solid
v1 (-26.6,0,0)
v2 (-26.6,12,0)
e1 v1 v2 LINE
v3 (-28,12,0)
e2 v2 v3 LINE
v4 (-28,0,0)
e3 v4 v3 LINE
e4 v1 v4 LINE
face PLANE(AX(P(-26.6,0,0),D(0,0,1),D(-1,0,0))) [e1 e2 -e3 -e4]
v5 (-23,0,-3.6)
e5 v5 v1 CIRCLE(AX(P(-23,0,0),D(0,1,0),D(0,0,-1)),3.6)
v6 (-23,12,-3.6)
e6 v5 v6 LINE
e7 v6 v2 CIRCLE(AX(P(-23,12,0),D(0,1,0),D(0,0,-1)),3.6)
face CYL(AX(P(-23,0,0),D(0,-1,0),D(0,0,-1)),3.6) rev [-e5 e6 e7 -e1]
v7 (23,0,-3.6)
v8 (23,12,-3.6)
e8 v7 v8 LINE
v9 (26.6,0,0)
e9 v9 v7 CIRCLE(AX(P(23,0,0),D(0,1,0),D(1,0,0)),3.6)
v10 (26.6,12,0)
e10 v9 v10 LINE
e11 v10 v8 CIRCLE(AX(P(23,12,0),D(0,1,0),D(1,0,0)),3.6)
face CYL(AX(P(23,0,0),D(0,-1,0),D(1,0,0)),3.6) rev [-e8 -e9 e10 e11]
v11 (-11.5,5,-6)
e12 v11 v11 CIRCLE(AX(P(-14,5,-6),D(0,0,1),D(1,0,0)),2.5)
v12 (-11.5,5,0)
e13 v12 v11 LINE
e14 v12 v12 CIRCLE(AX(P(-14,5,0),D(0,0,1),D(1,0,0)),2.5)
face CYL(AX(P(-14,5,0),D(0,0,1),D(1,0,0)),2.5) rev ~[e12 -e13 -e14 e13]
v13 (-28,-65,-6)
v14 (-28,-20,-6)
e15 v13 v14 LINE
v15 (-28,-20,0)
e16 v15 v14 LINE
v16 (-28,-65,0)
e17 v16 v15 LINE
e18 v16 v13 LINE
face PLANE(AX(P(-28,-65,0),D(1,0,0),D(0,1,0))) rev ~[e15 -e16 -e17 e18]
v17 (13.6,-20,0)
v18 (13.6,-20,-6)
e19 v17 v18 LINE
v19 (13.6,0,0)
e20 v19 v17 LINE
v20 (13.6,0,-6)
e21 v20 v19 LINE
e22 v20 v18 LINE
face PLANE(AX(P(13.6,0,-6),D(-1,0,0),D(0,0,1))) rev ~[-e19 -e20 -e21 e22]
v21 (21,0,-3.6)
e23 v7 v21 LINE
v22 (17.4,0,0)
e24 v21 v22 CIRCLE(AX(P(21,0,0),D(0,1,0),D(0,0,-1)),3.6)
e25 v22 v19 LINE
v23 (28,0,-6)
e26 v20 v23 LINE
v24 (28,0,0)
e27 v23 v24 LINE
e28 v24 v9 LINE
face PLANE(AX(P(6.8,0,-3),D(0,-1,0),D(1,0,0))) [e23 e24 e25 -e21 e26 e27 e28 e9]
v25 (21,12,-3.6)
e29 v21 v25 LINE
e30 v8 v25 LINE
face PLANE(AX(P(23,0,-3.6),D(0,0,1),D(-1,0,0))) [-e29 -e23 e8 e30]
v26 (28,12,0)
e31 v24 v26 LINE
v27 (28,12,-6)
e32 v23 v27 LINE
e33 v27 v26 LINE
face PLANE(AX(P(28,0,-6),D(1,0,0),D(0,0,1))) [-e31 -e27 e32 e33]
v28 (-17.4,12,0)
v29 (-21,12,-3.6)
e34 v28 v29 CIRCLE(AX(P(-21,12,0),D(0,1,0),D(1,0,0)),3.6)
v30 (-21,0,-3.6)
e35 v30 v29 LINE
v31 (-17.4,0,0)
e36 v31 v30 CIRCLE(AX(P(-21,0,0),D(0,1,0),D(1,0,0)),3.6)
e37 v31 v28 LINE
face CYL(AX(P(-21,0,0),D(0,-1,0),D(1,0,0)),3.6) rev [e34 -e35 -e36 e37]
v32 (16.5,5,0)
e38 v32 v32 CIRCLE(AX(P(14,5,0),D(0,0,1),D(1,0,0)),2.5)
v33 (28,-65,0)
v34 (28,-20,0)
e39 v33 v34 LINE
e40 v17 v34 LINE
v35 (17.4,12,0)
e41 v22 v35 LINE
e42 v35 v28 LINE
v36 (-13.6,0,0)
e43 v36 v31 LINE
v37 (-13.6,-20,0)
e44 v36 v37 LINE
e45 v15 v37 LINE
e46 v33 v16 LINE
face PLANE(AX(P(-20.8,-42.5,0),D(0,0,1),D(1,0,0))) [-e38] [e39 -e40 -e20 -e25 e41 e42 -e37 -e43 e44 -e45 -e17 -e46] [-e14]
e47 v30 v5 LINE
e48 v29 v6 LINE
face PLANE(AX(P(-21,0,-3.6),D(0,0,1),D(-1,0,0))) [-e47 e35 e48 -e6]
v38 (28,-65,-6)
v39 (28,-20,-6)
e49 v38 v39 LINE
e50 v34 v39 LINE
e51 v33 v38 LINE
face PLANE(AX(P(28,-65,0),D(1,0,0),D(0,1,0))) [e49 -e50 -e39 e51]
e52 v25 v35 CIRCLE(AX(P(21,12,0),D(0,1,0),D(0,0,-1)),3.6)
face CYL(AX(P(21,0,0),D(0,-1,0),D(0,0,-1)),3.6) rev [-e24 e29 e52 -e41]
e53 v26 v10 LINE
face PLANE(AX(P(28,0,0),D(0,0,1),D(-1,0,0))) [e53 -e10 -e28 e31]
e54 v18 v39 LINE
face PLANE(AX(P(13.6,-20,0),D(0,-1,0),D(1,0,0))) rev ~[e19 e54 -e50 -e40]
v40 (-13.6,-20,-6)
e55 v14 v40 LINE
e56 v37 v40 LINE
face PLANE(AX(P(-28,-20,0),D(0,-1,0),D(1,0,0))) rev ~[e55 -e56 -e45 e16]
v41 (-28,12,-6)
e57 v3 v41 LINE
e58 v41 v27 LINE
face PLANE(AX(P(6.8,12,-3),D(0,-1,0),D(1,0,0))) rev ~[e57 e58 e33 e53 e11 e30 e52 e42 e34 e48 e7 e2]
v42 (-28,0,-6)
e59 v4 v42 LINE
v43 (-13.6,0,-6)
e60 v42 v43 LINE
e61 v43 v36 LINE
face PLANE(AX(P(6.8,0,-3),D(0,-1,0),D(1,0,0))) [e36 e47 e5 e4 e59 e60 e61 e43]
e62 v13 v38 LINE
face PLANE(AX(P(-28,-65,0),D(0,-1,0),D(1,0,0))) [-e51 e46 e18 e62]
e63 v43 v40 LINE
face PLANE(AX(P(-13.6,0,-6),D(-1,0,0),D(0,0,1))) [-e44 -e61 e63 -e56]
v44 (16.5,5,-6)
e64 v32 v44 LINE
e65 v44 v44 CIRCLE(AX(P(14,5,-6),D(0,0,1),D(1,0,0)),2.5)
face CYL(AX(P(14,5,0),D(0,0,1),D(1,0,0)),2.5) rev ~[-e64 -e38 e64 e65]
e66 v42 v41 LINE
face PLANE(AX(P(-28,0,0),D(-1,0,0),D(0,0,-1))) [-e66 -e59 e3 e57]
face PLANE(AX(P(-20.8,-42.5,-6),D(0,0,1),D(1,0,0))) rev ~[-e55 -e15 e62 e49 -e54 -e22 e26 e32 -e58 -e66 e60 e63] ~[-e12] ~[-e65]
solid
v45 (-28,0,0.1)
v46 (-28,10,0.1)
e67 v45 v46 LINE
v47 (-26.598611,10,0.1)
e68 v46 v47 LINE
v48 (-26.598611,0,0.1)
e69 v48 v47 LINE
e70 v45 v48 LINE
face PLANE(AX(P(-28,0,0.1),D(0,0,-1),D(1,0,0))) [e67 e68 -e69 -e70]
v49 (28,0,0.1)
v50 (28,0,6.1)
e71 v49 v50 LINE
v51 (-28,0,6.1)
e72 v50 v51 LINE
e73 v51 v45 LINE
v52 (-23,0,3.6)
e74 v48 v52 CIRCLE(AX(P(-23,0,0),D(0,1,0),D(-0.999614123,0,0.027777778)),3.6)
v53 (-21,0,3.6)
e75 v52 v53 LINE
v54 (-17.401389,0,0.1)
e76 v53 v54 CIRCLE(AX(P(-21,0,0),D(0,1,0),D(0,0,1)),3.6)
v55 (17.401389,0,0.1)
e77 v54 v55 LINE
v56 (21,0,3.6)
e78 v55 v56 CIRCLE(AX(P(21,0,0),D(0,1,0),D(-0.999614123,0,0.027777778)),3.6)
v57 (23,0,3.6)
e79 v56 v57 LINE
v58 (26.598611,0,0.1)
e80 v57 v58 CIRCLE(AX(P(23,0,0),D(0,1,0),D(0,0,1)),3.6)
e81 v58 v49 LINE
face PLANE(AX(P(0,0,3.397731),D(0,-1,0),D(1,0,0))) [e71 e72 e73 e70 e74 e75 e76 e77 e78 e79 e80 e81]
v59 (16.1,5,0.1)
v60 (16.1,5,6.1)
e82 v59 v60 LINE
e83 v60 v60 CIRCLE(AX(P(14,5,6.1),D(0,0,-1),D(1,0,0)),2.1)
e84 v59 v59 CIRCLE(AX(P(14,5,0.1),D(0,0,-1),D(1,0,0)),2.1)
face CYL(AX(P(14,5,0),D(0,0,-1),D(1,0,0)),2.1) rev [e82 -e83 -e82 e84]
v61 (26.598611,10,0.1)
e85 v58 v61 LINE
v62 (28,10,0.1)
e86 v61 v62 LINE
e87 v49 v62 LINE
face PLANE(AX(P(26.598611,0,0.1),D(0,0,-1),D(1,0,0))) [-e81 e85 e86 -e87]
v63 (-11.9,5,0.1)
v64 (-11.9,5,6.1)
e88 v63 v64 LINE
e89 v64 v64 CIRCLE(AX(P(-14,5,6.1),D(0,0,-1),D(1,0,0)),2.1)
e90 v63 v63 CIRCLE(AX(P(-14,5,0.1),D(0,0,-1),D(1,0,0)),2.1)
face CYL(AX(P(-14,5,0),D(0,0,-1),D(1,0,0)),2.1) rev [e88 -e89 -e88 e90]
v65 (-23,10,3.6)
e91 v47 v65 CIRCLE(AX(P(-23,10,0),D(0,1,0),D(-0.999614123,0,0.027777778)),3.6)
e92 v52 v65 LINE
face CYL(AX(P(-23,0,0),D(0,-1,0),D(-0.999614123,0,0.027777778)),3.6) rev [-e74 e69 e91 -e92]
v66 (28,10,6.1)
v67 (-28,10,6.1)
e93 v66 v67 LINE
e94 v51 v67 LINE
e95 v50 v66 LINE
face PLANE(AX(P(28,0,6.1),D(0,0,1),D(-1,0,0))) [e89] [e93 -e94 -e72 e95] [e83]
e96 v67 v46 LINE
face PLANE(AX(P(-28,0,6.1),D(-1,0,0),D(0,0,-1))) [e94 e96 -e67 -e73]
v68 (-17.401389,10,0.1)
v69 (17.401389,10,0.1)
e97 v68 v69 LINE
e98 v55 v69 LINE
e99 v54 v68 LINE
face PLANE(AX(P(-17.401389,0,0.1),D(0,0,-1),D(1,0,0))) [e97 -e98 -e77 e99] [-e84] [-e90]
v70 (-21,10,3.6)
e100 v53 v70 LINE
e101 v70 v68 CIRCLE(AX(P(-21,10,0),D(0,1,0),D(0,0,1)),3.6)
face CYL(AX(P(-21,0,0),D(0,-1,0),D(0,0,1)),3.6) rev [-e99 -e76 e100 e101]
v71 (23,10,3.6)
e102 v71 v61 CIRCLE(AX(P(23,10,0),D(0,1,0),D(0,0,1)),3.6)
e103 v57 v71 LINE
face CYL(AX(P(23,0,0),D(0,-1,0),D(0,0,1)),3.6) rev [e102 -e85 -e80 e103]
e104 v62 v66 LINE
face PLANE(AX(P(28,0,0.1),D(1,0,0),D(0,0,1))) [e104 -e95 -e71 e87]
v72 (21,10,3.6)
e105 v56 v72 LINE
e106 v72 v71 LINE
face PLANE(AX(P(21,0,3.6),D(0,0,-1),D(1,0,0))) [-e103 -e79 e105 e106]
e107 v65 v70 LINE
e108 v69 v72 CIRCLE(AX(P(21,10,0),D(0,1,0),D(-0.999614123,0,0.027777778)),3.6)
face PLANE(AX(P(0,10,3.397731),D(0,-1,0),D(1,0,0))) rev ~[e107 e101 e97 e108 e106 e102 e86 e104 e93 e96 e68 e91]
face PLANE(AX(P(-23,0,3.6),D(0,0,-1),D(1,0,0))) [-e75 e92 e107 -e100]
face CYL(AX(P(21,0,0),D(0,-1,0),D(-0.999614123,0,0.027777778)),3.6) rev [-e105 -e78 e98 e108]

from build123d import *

# Parameters (mm, degrees)
F0_W      = 13.6
F0_H      = 6
F0_W_2    = 3.8
F1_DEPTH  = 12
F4_DEPTH  = 10
F3_R      = 2.1
F5_DEPTH  = 25
F3_R_2    = 2.5
F6_DEPTH  = 25
F8_DEPTH  = 65
F9_W      = 14.4
F9_H      = 45
F10_DEPTH = 6


# Not quite as in the source:
# - a feature of the source that left no trace in its solid (it failed there, or was rolled back) is left out


with BuildPart() as f1:
    # F0 (on Front) → F1 (new body)
    with BuildSketch(Plane.XZ):
        with Locations((6.8, -3)):
            Rectangle(F0_W, F0_H)
        with Locations((15.5, -3)):
            Rectangle(F0_W_2, F0_H)
        with Locations((-15.5, -3)):
            Rectangle(F0_W_2, F0_H)
        with Locations((-6.8, -3)):
            Rectangle(F0_W, F0_H)
        with BuildLine():
            Line((-17.4, -6), (-17.4, 0))
            ThreePointArc((-17.4, 0), (-18.4544155877, -2.5455844123), (-21, -3.6))
            Line((-21, -3.6), (-23, -3.6))
            ThreePointArc((-23, -3.6), (-25.5455844123, -2.5455844123), (-26.6, 0))
            Line((-26.6, 0), (-28, 0))
            Line((-28, 0), (-28, -6))
            Line((-28, -6), (-17.4, -6))
        make_face()
        with BuildLine():
            ThreePointArc((21, -3.6), (18.4544155877, -2.5455844123), (17.4, 0))
            Line((17.4, 0), (17.4, -6))
            Line((17.4, -6), (28, -6))
            Line((28, -6), (28, 0))
            Line((28, 0), (26.6, 0))
            ThreePointArc((26.6, 0), (25.5455844123, -2.5455844123), (23, -3.6))
            Line((23, -3.6), (21, -3.6))
        make_face()
    extrude(amount=-F1_DEPTH)

    # F3 (on Top) → F6 (cut)
    with BuildSketch(Plane.XY):
        with Locations((-14, 5)):
            Circle(F3_R_2)
        with Locations((-14, 5)):
            Circle(F3_R, mode=Mode.SUBTRACT)
        with Locations((14, 5)):
            Circle(F3_R_2)
        with Locations((14, 5)):
            Circle(F3_R, mode=Mode.SUBTRACT)
        with Locations((-14, 5)):
            Circle(F3_R)
        with Locations((14, 5)):
            Circle(F3_R)
    extrude(amount=-F6_DEPTH, mode=Mode.SUBTRACT)

    # F0 (on Front) → F8 (join)
    with BuildSketch(Plane.XZ):
        with Locations((-6.8, -3)):
            Rectangle(F0_W, F0_H)
        with Locations((6.8, -3)):
            Rectangle(F0_W, F0_H)
    extrude(amount=F8_DEPTH)

    # F9 (on face) → F10 (join)
    with BuildSketch(Plane.XY):
        with Locations((-20.8, -42.5)):
            Rectangle(F9_W, F9_H)
        with Locations((20.8, -42.5)):
            Rectangle(F9_W, F9_H)
    extrude(amount=-F10_DEPTH)


with BuildPart() as f4:
    # F0 (on Front) → F4 (new body)
    with BuildSketch(Plane.XZ):
        with BuildLine():
            Line((-17.4013891569, 0.1), (17.4013891569, 0.1))
            ThreePointArc((17.4013891569, 0.1), (18.4900199204, 2.5806975801), (21, 3.6))
            Line((21, 3.6), (23, 3.6))
            ThreePointArc((23, 3.6), (25.5099800796, 2.5806975801), (26.5986108431, 0.1))
            Line((26.5986108431, 0.1), (28, 0.1))
            Line((28, 0.1), (28, 6.1))
            Line((28, 6.1), (-28, 6.1))
            Line((-28, 6.1), (-28, 0.1))
            Line((-28, 0.1), (-26.5986108431, 0.1))
            ThreePointArc((-26.5986108431, 0.1), (-25.5099800796, 2.5806975801), (-23, 3.6))
            Line((-23, 3.6), (-21, 3.6))
            ThreePointArc((-21, 3.6), (-18.4900199204, 2.5806975801), (-17.4013891569, 0.1))
        make_face()
    extrude(amount=-F4_DEPTH)

    # F3 (on Top) → F5 (cut)
    with BuildSketch(Plane.XY):
        with Locations((14, 5)):
            Circle(F3_R)
        with Locations((-14, 5)):
            Circle(F3_R)
    extrude(amount=F5_DEPTH, mode=Mode.SUBTRACT)


solid = Compound([f1.part, f4.part])
